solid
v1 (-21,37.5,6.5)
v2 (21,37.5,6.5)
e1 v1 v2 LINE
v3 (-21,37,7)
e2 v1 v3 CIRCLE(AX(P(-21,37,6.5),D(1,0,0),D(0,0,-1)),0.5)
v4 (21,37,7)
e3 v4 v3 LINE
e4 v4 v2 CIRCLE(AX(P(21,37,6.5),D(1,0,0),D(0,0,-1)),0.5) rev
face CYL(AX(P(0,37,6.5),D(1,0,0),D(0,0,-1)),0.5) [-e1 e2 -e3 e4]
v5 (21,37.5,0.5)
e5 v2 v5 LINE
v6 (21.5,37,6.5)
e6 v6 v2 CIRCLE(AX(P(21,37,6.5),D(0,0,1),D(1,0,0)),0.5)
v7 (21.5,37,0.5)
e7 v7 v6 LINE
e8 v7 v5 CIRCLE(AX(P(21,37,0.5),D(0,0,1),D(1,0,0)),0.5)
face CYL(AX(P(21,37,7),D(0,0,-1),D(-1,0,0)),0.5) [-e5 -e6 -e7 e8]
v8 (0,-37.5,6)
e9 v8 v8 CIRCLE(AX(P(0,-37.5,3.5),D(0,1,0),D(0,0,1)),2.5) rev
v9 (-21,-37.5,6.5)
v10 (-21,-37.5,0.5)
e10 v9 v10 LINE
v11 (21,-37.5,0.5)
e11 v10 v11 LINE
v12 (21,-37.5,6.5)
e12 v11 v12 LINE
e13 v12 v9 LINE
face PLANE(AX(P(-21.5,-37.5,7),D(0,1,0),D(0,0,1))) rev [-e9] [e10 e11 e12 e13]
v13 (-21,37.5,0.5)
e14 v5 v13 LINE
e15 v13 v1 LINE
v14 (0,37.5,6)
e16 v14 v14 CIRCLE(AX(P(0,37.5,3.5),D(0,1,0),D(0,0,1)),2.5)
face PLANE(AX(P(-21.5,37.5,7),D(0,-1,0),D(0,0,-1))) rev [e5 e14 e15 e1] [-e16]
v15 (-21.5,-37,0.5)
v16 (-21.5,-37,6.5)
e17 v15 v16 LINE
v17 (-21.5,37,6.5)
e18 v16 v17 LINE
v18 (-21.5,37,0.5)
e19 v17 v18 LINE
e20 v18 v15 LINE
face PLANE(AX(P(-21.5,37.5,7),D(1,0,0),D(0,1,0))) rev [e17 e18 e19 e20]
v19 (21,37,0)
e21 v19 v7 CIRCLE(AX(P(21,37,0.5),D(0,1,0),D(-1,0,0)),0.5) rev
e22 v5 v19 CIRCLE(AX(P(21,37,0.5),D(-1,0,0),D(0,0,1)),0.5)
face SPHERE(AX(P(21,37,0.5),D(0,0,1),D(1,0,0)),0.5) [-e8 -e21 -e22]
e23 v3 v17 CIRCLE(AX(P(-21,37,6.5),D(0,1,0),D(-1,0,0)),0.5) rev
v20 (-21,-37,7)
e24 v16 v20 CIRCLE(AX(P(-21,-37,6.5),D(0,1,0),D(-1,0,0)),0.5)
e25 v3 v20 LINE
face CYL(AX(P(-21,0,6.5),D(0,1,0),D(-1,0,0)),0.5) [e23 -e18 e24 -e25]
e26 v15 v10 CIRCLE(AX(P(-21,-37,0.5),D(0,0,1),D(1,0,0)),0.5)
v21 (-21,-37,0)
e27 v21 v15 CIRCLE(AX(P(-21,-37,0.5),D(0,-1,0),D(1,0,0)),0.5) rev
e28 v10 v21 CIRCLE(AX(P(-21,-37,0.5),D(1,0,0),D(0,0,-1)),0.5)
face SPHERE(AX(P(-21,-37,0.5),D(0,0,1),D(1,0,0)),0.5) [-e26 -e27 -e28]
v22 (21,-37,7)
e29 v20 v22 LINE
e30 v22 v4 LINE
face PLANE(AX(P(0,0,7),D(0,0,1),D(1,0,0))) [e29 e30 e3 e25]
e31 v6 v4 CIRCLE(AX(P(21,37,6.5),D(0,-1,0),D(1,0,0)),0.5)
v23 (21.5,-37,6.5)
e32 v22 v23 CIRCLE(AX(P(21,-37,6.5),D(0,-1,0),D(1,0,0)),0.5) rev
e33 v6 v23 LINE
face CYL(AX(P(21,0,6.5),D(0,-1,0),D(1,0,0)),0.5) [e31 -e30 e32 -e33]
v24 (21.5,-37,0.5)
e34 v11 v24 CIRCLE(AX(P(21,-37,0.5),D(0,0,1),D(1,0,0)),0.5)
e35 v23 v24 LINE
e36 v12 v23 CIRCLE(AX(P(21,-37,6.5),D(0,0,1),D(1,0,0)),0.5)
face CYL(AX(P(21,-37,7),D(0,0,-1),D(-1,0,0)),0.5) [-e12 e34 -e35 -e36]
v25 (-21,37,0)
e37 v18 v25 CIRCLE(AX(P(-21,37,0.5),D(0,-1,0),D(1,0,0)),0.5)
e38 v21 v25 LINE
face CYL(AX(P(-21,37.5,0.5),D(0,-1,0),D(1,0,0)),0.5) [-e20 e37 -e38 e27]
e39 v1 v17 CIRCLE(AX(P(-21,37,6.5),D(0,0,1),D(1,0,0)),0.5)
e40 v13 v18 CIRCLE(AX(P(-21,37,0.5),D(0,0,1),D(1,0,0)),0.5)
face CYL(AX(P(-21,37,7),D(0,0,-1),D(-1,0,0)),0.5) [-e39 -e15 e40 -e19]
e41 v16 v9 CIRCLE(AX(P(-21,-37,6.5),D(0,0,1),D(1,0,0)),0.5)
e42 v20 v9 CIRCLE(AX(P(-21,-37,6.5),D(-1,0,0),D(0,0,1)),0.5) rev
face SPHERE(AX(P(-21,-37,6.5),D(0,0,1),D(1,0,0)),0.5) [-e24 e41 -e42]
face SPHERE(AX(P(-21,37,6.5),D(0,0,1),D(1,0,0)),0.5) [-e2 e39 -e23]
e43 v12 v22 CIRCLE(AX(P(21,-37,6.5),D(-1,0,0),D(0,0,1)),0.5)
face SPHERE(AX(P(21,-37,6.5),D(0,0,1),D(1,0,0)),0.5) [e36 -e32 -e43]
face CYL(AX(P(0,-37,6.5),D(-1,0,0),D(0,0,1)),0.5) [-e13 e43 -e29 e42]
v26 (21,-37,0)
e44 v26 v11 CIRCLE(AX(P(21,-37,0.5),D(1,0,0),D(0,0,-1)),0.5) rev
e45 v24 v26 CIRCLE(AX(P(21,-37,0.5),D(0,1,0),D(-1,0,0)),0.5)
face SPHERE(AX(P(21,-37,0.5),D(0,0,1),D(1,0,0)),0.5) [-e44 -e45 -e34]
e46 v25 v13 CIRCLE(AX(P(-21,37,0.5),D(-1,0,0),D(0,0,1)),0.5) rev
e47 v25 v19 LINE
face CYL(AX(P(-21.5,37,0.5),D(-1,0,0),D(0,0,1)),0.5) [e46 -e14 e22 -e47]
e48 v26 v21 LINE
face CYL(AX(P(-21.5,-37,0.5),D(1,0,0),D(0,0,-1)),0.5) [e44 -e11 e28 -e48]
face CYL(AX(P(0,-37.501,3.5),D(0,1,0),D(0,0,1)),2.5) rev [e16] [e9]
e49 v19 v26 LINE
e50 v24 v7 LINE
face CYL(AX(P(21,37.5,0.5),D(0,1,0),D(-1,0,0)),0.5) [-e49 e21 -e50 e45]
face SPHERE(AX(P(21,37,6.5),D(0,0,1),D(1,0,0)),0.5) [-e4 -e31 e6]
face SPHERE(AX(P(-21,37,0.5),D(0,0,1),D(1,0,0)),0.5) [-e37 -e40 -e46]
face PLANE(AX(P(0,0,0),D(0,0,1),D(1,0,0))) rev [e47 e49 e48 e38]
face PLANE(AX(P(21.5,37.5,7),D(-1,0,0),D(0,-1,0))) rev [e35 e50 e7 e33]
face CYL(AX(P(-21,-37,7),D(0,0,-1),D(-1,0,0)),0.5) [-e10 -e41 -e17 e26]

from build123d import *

# Parameters (mm, degrees)
SKETCH1_W           = 43
SKETCH1_H           = 75
BOSS_EXTRUDE1_DEPTH = 7
CUT_EXTRUDE1_REACH  = 80.334
SKETCH2_R           = 2.5
FILLET1_R           = 0.5
FILLET2_R           = 0.5


with BuildPart() as part:
    # Sketch1 → Boss-Extrude1 (new body)
    with BuildSketch(Plane.XY):
        Rectangle(SKETCH1_W, SKETCH1_H)
    extrude(amount=BOSS_EXTRUDE1_DEPTH)

    # Sketch2 → Cut-Extrude1 (cut, up to next)
    with BuildSketch(Plane(origin=(0, 37.5, 0), x_dir=(1, 0, 0), z_dir=(0, 1, 0)), mode=Mode.PRIVATE) as cut_extrude1_sk1:
        with Locations(Location((0, -3.5, 0), (0, 0, 270))):
            Circle(SKETCH2_R)
    cut_extrude1_tool1 = extrude(cut_extrude1_sk1.sketch, amount=-CUT_EXTRUDE1_REACH, mode=Mode.PRIVATE) & part.part
    add(cut_extrude1_tool1.solids().sort_by_distance((0, 37.5, 3.5))[0], mode=Mode.SUBTRACT)

    # Fillet1
    fillet1_edges = [part.edges().sort_by_distance(p)[0] for p in [
        (-21.5, 0, 7),
        (0, -37.5, 7),
        (21.5, 0, 7),
        (0, -37.5, 0),
        (-21.5, 0, 0),
        (0, 37.5, 0),
        (21.5, 0, 0),
        (0, 37.5, 7),
    ]]
    fillet(fillet1_edges, radius=FILLET1_R)

    # Fillet2
    # the kernel refuses this fillet: 0.5 mm, written as the material it takes off along each edge
    with BuildSketch(Plane(origin=(-21, -37, 6.5), x_dir=(0, -1, 0), z_dir=(-1, 0, 0))) as fillet2_piece_1_section:
        Polygon((0, 0), (FILLET2_R, 0), (FILLET2_R, FILLET2_R), (0, FILLET2_R), align=None)
    fillet2_piece_1 = extrude(amount=FILLET2_R, mode=Mode.PRIVATE)
    fillet2_piece_1 = fillet2_piece_1 - Plane(origin=(-21, -37, 6.5), x_dir=(0, 0.7071067811865475, -0.7071067811865475), z_dir=(-1, 0, 0)) * Sphere(FILLET2_R, mode=Mode.PRIVATE)
    add(fillet2_piece_1, mode=Mode.SUBTRACT)
    with BuildSketch(Plane(origin=(-21, 37, 6.5), x_dir=(-1, 0, 0), z_dir=(0, 1, 0))) as fillet2_piece_2_section:
        Polygon((0, 0), (FILLET2_R, 0), (FILLET2_R, FILLET2_R), (0, FILLET2_R), align=None)
    fillet2_piece_2 = extrude(amount=FILLET2_R, mode=Mode.PRIVATE)
    fillet2_piece_2 = fillet2_piece_2 - Plane(origin=(-21, 37, 6.5), x_dir=(0.7071067811865475, 0, -0.7071067811865475), z_dir=(0, 1, 0)) * Sphere(FILLET2_R, mode=Mode.PRIVATE)
    add(fillet2_piece_2, mode=Mode.SUBTRACT)
    with BuildSketch(Plane(origin=(21, -37, 6.5), x_dir=(0, -1, 0), z_dir=(1, 0, 0))) as fillet2_piece_3_section:
        Polygon((0, 0), (FILLET2_R, 0), (FILLET2_R, -FILLET2_R), (0, -FILLET2_R), align=None)
    fillet2_piece_3 = extrude(amount=FILLET2_R, mode=Mode.PRIVATE)
    fillet2_piece_3 = fillet2_piece_3 - Plane(origin=(21, -37, 6.5), x_dir=(0, 0.7071067811865475, -0.7071067811865475), z_dir=(1, 0, 0)) * Sphere(FILLET2_R, mode=Mode.PRIVATE)
    add(fillet2_piece_3, mode=Mode.SUBTRACT)
    with BuildSketch(Plane(origin=(21, 37, 6.5), x_dir=(1, 0, 0), z_dir=(0, 1, 0))) as fillet2_piece_4_section:
        Polygon((0, 0), (FILLET2_R, 0), (FILLET2_R, -FILLET2_R), (0, -FILLET2_R), align=None)
    fillet2_piece_4 = extrude(amount=FILLET2_R, mode=Mode.PRIVATE)
    fillet2_piece_4 = fillet2_piece_4 - Plane(origin=(21, 37, 6.5), x_dir=(-0.7071067811865475, 0, -0.7071067811865475), z_dir=(0, 1, 0)) * Sphere(FILLET2_R, mode=Mode.PRIVATE)
    add(fillet2_piece_4, mode=Mode.SUBTRACT)
    with BuildSketch(Plane(origin=(21, -37, 0.5), x_dir=(0, -1, 0), z_dir=(1, 0, 0))) as fillet2_piece_5_section:
        Polygon((0, 0), (FILLET2_R, 0), (FILLET2_R, FILLET2_R), (0, FILLET2_R), align=None)
    fillet2_piece_5 = extrude(amount=FILLET2_R, mode=Mode.PRIVATE)
    fillet2_piece_5 = fillet2_piece_5 - Plane(origin=(21, -37, 0.5), x_dir=(0, 0.7071067811865475, 0.7071067811865475), z_dir=(1, 0, 0)) * Sphere(FILLET2_R, mode=Mode.PRIVATE)
    add(fillet2_piece_5, mode=Mode.SUBTRACT)
    with BuildSketch(Plane(origin=(-21, -37, 0.5), x_dir=(0, -1, 0), z_dir=(-1, 0, 0))) as fillet2_piece_6_section:
        Polygon((0, 0), (FILLET2_R, 0), (FILLET2_R, -FILLET2_R), (0, -FILLET2_R), align=None)
    fillet2_piece_6 = extrude(amount=FILLET2_R, mode=Mode.PRIVATE)
    fillet2_piece_6 = fillet2_piece_6 - Plane(origin=(-21, -37, 0.5), x_dir=(0, 0.7071067811865475, 0.7071067811865475), z_dir=(-1, 0, 0)) * Sphere(FILLET2_R, mode=Mode.PRIVATE)
    add(fillet2_piece_6, mode=Mode.SUBTRACT)
    with BuildSketch(Plane(origin=(21, 37, 0.5), x_dir=(1, 0, 0), z_dir=(0, 1, 0))) as fillet2_piece_7_section:
        Polygon((0, 0), (FILLET2_R, 0), (FILLET2_R, FILLET2_R), (0, FILLET2_R), align=None)
    fillet2_piece_7 = extrude(amount=FILLET2_R, mode=Mode.PRIVATE)
    fillet2_piece_7 = fillet2_piece_7 - Plane(origin=(21, 37, 0.5), x_dir=(-0.7071067811865475, 0, 0.7071067811865475), z_dir=(0, 1, 0)) * Sphere(FILLET2_R, mode=Mode.PRIVATE)
    add(fillet2_piece_7, mode=Mode.SUBTRACT)
    with BuildSketch(Plane(origin=(-21, 37, 0.5), x_dir=(-1, 0, 0), z_dir=(0, 1, 0))) as fillet2_piece_8_section:
        Polygon((0, 0), (FILLET2_R, 0), (FILLET2_R, -FILLET2_R), (0, -FILLET2_R), align=None)
    fillet2_piece_8 = extrude(amount=FILLET2_R, mode=Mode.PRIVATE)
    fillet2_piece_8 = fillet2_piece_8 - Plane(origin=(-21, 37, 0.5), x_dir=(0.7071067811865475, 0, 0.7071067811865475), z_dir=(0, 1, 0)) * Sphere(FILLET2_R, mode=Mode.PRIVATE)
    add(fillet2_piece_8, mode=Mode.SUBTRACT)
    with BuildSketch(Plane(origin=(21.5, 37.5, 0.5), x_dir=(-1, 0, 0), z_dir=(0, 0, 1)), Plane(origin=(21.5, -37.5, 0.5), x_dir=(0, 1, 0), z_dir=(0, 0, 1))) as fillet2_piece_9:
        with BuildLine():
            CenterArc((FILLET2_R, FILLET2_R), FILLET2_R, 180, 90)
            Line((0, FILLET2_R), (0, 0))
            Line((0, 0), (FILLET2_R, 0))
        make_face()
    extrude(amount=6, mode=Mode.SUBTRACT)
    with BuildSketch(Plane(origin=(-21.5, -37.5, 0.5), x_dir=(0, 1, 0), z_dir=(0, 0, 1)), Plane(origin=(-21.5, 37.5, 0.5), x_dir=(1, 0, 0), z_dir=(0, 0, 1))) as fillet2_piece_10:
        with BuildLine():
            CenterArc((FILLET2_R, -FILLET2_R), FILLET2_R, 90, 90)
            Line((0, -FILLET2_R), (0, 0))
            Line((0, 0), (FILLET2_R, 0))
        make_face()
    extrude(amount=6, mode=Mode.SUBTRACT)


solid = part.part
